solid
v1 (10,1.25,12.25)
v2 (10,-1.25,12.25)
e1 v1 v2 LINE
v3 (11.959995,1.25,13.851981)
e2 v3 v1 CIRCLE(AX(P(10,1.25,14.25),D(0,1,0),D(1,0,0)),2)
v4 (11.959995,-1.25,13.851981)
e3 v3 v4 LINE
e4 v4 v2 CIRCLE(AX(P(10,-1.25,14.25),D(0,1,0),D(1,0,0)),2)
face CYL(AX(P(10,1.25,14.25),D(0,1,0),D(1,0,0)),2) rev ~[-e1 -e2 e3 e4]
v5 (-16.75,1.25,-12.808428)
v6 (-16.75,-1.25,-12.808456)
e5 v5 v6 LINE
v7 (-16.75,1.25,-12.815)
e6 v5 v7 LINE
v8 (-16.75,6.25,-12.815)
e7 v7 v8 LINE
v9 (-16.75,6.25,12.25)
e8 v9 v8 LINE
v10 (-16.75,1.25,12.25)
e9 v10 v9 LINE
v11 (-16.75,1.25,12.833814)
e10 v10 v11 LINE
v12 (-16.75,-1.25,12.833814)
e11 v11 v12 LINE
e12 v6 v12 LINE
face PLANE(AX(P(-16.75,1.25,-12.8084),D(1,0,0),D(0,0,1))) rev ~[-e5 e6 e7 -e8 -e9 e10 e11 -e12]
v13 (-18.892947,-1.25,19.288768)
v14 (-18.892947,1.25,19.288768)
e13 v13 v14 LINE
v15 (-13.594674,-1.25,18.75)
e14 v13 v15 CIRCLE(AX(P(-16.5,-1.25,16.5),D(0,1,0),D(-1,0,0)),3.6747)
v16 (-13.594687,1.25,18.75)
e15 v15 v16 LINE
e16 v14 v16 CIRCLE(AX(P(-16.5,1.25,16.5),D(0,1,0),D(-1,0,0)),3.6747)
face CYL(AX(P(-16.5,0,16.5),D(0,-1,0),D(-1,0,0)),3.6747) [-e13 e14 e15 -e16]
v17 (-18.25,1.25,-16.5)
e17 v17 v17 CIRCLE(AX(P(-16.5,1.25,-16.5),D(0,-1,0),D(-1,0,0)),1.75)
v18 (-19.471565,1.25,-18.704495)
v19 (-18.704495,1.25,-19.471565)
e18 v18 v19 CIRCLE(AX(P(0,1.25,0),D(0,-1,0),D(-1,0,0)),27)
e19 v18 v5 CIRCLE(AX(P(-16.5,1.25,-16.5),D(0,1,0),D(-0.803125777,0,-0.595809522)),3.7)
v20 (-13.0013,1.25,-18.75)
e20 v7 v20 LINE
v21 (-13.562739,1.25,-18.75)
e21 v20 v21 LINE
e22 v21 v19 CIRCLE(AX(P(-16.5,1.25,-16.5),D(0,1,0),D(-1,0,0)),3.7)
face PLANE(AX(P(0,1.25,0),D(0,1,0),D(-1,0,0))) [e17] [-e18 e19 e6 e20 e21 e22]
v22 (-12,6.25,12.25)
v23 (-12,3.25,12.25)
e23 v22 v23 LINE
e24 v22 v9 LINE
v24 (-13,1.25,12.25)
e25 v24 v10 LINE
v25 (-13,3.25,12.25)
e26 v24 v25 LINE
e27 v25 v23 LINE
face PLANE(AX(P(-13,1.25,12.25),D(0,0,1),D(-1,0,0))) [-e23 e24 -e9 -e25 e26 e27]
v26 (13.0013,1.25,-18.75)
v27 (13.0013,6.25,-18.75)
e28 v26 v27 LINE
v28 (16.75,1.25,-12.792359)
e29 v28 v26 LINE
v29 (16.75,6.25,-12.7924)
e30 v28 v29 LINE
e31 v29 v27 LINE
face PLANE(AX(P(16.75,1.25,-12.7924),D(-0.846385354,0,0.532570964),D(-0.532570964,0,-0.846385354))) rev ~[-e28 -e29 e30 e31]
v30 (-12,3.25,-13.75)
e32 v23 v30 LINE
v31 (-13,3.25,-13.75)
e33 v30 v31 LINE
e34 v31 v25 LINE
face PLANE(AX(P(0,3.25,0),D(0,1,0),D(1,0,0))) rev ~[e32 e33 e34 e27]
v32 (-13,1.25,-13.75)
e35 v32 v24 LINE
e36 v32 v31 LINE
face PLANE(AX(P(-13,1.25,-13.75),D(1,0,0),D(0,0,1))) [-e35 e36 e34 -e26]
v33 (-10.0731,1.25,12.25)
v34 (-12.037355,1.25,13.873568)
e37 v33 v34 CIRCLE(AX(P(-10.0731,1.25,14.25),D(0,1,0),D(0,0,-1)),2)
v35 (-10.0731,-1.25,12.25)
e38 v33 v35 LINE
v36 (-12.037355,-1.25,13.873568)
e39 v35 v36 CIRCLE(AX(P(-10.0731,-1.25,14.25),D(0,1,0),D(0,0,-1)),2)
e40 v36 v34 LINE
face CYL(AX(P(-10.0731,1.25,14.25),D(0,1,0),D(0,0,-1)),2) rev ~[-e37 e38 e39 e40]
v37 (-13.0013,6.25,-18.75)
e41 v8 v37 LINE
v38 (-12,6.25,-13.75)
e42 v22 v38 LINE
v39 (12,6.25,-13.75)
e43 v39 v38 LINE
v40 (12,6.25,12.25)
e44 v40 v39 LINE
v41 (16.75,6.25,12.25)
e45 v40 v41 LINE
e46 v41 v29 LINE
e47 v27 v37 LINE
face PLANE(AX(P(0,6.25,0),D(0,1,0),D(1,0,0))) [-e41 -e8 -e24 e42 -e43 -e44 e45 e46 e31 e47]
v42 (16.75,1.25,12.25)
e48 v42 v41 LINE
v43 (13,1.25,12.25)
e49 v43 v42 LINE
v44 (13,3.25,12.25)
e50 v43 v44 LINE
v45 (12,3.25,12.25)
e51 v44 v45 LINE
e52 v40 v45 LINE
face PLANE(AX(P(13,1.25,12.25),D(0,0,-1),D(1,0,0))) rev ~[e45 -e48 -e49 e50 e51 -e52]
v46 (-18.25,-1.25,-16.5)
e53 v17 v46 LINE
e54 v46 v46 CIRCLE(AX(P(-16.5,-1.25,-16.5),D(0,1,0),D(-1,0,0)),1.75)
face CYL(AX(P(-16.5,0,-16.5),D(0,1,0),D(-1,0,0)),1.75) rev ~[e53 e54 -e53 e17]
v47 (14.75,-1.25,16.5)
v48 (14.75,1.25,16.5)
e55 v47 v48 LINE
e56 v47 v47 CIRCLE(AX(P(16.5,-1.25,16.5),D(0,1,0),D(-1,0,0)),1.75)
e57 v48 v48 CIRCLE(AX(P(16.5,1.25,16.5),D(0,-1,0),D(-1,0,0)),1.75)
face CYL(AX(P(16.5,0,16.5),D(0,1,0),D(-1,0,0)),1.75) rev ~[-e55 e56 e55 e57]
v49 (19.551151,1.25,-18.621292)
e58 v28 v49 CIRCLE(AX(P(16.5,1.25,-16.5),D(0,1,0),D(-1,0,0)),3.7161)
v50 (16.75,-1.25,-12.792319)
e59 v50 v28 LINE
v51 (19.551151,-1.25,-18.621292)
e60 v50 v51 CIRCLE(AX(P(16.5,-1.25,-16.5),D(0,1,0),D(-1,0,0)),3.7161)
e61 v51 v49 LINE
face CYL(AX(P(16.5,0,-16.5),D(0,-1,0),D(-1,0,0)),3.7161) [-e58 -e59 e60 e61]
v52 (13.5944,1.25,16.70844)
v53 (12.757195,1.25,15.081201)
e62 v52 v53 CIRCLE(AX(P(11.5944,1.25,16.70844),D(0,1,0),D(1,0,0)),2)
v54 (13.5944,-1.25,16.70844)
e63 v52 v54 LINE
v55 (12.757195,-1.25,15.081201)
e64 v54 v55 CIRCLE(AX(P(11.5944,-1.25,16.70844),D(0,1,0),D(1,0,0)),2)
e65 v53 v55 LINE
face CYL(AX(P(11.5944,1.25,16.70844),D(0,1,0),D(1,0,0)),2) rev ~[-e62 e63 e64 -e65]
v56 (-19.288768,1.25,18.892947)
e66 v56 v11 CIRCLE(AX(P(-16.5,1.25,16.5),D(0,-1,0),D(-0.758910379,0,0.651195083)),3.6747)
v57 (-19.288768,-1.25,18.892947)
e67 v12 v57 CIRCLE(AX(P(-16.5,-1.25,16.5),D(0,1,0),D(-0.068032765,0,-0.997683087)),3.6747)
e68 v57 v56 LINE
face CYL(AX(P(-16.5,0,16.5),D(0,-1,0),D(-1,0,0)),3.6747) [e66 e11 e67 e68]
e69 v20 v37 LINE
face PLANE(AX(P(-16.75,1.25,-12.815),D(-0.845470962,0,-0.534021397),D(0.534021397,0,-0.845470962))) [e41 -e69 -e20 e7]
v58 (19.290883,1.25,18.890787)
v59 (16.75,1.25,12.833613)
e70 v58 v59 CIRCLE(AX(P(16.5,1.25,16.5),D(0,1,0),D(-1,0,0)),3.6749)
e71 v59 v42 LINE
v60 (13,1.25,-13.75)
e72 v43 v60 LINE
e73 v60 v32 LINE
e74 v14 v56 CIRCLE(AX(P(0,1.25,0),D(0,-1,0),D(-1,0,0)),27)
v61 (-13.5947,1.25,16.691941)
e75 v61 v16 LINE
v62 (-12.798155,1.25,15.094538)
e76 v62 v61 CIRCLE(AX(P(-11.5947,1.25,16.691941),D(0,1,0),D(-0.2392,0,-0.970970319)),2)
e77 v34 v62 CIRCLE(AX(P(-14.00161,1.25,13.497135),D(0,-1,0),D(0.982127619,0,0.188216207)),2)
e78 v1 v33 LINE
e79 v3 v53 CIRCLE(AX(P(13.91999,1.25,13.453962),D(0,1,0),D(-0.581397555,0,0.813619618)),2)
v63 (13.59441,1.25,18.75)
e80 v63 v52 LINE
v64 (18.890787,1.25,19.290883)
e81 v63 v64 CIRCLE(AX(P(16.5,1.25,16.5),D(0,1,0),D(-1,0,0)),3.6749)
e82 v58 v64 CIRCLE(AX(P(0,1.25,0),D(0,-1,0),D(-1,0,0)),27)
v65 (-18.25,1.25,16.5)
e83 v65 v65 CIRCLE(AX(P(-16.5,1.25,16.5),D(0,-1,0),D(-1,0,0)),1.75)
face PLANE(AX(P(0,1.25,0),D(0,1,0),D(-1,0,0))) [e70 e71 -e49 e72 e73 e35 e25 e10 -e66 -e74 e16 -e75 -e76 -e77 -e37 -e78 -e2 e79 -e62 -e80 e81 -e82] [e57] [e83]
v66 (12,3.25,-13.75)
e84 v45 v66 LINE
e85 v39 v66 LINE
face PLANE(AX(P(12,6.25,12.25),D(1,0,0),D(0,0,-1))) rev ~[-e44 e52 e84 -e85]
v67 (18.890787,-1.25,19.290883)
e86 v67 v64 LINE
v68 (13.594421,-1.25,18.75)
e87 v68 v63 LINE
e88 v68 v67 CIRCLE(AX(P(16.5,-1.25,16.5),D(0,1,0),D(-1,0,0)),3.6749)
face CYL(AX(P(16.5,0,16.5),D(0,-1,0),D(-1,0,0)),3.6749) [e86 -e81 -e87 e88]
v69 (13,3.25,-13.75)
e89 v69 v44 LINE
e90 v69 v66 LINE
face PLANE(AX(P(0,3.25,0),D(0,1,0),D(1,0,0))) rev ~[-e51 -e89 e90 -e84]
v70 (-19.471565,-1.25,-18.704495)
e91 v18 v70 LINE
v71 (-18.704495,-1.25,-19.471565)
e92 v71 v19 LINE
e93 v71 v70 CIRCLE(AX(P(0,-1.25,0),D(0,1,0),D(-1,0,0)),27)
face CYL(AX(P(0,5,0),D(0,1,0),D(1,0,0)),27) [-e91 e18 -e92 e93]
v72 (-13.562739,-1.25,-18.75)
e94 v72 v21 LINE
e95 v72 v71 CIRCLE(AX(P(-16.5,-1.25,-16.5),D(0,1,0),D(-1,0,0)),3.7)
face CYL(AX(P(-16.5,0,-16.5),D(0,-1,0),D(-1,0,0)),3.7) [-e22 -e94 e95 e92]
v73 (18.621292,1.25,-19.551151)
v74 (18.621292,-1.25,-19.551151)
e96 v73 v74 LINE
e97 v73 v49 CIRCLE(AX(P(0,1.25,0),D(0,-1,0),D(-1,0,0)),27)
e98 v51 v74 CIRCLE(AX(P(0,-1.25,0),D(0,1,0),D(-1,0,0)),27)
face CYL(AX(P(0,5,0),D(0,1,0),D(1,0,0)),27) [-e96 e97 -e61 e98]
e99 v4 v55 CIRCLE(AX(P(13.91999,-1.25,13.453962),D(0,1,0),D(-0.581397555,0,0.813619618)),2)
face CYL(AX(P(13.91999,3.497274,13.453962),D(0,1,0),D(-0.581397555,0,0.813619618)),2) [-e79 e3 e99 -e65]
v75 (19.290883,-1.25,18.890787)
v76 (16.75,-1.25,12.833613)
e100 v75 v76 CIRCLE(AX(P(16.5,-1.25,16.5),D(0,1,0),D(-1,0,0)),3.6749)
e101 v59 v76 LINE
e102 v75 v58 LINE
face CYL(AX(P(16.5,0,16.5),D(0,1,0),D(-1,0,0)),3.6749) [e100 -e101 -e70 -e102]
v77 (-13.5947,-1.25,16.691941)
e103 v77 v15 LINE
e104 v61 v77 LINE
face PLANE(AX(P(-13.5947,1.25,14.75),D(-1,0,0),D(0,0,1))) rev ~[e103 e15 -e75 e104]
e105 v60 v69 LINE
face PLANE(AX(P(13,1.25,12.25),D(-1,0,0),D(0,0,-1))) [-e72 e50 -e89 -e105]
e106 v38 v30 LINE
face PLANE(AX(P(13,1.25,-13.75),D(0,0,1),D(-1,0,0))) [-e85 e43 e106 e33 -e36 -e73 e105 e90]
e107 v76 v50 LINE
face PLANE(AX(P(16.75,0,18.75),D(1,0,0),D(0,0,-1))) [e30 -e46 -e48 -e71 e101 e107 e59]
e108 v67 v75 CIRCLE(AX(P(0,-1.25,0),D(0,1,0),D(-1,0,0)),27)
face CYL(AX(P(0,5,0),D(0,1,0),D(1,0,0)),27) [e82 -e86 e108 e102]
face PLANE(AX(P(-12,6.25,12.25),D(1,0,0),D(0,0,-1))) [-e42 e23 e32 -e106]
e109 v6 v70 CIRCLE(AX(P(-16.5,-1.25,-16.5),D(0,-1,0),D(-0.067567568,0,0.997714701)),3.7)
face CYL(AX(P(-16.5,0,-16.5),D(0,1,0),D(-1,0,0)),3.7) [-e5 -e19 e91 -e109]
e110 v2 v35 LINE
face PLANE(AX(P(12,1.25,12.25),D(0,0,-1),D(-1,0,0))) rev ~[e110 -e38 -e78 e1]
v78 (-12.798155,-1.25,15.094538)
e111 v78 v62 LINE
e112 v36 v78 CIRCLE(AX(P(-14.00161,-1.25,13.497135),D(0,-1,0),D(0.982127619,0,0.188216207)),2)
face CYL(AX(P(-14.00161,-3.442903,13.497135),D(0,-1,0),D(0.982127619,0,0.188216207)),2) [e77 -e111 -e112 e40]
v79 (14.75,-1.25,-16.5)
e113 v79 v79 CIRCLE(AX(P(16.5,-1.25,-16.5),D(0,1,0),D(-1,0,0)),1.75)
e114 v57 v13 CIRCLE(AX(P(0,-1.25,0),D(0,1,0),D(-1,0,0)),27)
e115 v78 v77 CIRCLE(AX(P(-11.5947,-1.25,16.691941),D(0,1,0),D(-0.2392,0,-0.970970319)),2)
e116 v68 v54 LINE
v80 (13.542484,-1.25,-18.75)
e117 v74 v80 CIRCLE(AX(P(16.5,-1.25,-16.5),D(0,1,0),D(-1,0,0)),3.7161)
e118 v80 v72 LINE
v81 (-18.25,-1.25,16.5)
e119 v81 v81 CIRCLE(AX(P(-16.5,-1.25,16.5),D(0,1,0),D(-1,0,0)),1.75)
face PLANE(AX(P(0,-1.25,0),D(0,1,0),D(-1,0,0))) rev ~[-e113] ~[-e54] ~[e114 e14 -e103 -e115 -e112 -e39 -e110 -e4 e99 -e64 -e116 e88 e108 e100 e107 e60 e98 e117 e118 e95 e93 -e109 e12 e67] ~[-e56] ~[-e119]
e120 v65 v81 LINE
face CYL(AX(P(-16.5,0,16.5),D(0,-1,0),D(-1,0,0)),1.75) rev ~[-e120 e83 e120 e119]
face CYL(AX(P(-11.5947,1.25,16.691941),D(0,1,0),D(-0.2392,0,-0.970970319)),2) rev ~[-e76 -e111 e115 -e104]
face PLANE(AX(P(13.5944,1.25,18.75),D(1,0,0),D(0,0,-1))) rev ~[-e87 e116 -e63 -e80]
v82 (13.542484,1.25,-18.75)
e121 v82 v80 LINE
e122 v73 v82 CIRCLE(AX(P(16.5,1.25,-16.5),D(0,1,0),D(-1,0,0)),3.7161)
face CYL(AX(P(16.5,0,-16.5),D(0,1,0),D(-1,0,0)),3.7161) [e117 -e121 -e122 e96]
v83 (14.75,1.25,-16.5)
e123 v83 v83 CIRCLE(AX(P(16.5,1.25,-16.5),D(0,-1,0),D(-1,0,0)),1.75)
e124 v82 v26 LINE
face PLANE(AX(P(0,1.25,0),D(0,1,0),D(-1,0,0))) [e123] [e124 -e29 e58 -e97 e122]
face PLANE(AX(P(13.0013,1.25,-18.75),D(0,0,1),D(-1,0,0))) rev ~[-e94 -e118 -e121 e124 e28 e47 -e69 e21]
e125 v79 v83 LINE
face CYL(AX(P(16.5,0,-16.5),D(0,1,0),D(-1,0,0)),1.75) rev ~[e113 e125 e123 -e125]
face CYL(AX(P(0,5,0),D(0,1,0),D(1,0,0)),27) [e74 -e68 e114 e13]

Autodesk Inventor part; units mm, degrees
ref_plane "YZ Plane" through (0, 0, 0) normal (1, 0, 0) x (0, 1, 0)
sketch "Skizze1" plane through (0, 0, 0) normal (0, 1, 0) x (-1, 0, 0)
  circle A0 centre (0, 0) radius 30
  circle A1 centre (0, 0) radius 27
  dimension "d0" = 60
  dimension "d1" = 54
extrude "Extrusion1" add sketch "Skizze1" along normal mid plane 10
sketch "Skizze5" plane through (0, 0, 0) normal (0, 1, 0) x (-1, 0, 0)
  line L0 (12.75, -14.75) -> (-12.75, -14.75)
  line L1 (-12.75, -14.75) -> (-12.75, 14.75)
  line L2 (-12.75, 14.75) -> (12.75, 14.75)
  line L3 (12.75, 14.75) -> (12.75, -14.75)
  line L4 (49.4097, 0) -> (-52.5504, 0) construction
  line L5 (0, -53.7913) -> (0, 68.1535) construction
  line L6 (-16.75, -18.75) -> (16.75, -18.75)
  line L7 (16.75, -18.75) -> (16.75, 18.75)
  line L8 (16.75, 18.75) -> (-16.75, 18.75)
  line L9 (-16.75, 18.75) -> (-16.75, -18.75)
  point P0 (0, 0)
  dimension "d33" = 29.5
  dimension "d34" = 25.5
  dimension "d35" = 4
extrude "Extrusion5" add sketch "Skizze5" along normal mid plane 2.5 contours L0 L1 L2 L3 | L9 L8 L7 L6
ref_plane "Arbeitsebene1" through (0, 0, 0) normal (0, 1, 0) x (-1, 0, 0)
chamfer "Fase1" distance 1 angle 45 2 edges at (30, 5, 0) (30, -5, 0)
sketch "Skizze2" plane through (0, 0, 0) normal (0, 1, 0) x (-1, 0, 0)
  line L0 (0, 42.2301) -> (0, -36.7007) construction
  line L1 (32.6355, 0) -> (-32.6355, 0) construction
  line L2 (16.5, 34.419) -> (16.5, -40.3324) construction
  line L3 (-16.5, 35.4304) -> (-16.5, -34.8157) construction
  line L4 (23.5881, 16.5) -> (-32.0387, 16.5) construction
  line L5 (23.5881, -16.5) -> (-39.8541, -16.5) construction
  circle A0 centre (16.5, -16.5) radius 1.75
  circle A1 centre (16.5, 16.5) radius 1.75
  circle A2 centre (-16.5, 16.5) radius 1.75
  circle A3 centre (-16.5, -16.5) radius 1.75
  circle A4 centre (-16.5, 16.5) radius 3.6749
  circle A5 centre (-16.5, -16.5) radius 3.7161
  circle A6 centre (16.5, -16.5) radius 3.7
  circle A7 centre (16.5, 16.5) radius 3.6747
  point P0 (0, 0)
  dimension "d8" = 33
  dimension "d9" = 33
  dimension "d10" = 3.5
  dimension "d11" = 3.5
  dimension "d12" = 3.5
  dimension "d13" = 3.5
extrude "Extrusion2" add sketch "Skizze2" along normal mid plane 2.5
ref_plane "Arbeitsebene2" through (0, 0, -30.5) normal (0, 0, 1) x (1, 0, 0)
extrude "Extrusion6" cut sketch "Skizze2" against normal mid plane 3 contours A0 | A1 | A2 | A3
sketch "Skizze12" plane through (0, 5, 0) normal (0, 1, 0) x (1, 0, 0)
  circle A0 centre (0, 0) radius 27
  circle A1 centre (0, 0) radius 31.5802
extrude "Extrusion13" cut sketch "Skizze12" against normal blind 10
sketch "Skizze13" plane through (0, 1.25, 0) normal (0, 1, 0) x (1, 0, 0)
  line L0 (-13.5947, -18.75) -> (13.5944, -18.75) projected
  line L1 (-13.5947, -18.75) -> (13.5944, -18.75)
  line L2 (13.5944, -18.75) -> (13.5944, -14.75)
  line L3 (13.5944, -14.75) -> (-13.5947, -14.75)
  line L4 (-13.5947, -14.75) -> (-13.5947, -18.75)
  point P0 (0, 0)
  dimension "d58" = 4
extrude "Extrusion14" cut sketch "Skizze13" against normal blind 3
sketch "Skizze14" plane through (0, 1.25, 0) normal (0, 1, 0) x (1, 0, 0)
  line L0 (-13, -12.25) -> (13, -12.25)
  line L1 (13, -12.25) -> (13, 13.75)
  line L2 (13, 13.75) -> (-13, 13.75)
  line L3 (-13, 13.75) -> (-13, -12.25)
  line L4 (0, -43.7267) -> (0, 49.5069) construction
  line L5 (-24.7381, 0) -> (29.5694, 0) construction
  line L6 (13.5425, 18.75) -> (-13.5627, 18.75) construction
  line L7 (-13, -12.25) -> (-16.75, -12.25)
  line L8 (-16.75, 12.8084) -> (-16.75, -12.8338) projected
  line L9 (-16.75, -12.25) -> (-16.75, 12.815)
  line L10 (-16.75, 12.815) -> (-13.0013, 18.75)
  line L11 (13, -12.25) -> (16.75, -12.25)
  line L12 (16.75, -12.8336) -> (16.75, 12.7924) projected
  arc A0 (16.75, 12.7924) -> (19.551, 18.6215) centre (16.5, 16.5) ccw projected
  line L13 (16.75, -12.25) -> (16.75, 12.7924)
  line L14 (16.75, 12.7924) -> (13.0013, 18.75)
  line L15 (13.0013, 18.75) -> (-13.0013, 18.75)
  point P0 (0, 0)
  dimension "d62" = 26
  dimension "d63" = 26
  dimension "d64" = 5
extrude "Extrusion15" add sketch "Skizze14" along normal blind 5 contours L7 L8 L9 L10 L15 L14 L12 L11 L1 L2 L3
sketch "Skizze15" plane through (0, 6.25, 0) normal (0, 1, 0) x (1, 0, 0)
  line L0 (-13, 13.75) -> (-13, -12.25) projected
  line L1 (13, 13.75) -> (-13, 13.75) projected
  line L2 (-13, -12.25) -> (-12, -12.25)
  line L3 (-12, -12.25) -> (-12, 13.75)
  line L4 (-12, 13.75) -> (-13, 13.75)
  line L5 (-13, 13.75) -> (-13, -12.25)
  line L6 (13, -12.25) -> (16.75, -12.25) projected
  line L7 (13, -12.25) -> (12, -12.25)
  line L8 (12, -12.25) -> (12, 13.75)
  line L9 (12, 13.75) -> (13, 13.75)
  line L10 (13, 13.75) -> (13, -12.25)
  point P0 (0, 0)
  dimension "d67" = 1
  dimension "d68" = 1
extrude "Extrusion16" add sketch "Skizze15" against normal blind 3
sketch "Skizze16" plane through (0, 1.25, 0) normal (0, 1, 0) x (1, 0, 0)
  line L0 (12, -12.25) -> (12, 13.75) projected
  line L1 (12, -12.25) -> (-12.0731, -12.25)
  line L2 (-12.0731, -12.25) -> (-12.0731, -16.1057)
  line L3 (-12.0731, -16.1057) -> (12, -16.1057)
  line L4 (12, -16.1057) -> (12, -12.25)
  point P0 (0, 0)
extrude "Extrusion17" cut sketch "Skizze16" against normal blind 10
fillet "Rundung5" radius 2 6 edges at (-13.5947, 0, 14.75) (-12.0731, 0, 14.75) (-12.0731, 0, 12.25) (12, 0, 12.25) (12, 0, 14.75) (13.5944, 0, 14.75)
properties part number "_3D-Druck"
